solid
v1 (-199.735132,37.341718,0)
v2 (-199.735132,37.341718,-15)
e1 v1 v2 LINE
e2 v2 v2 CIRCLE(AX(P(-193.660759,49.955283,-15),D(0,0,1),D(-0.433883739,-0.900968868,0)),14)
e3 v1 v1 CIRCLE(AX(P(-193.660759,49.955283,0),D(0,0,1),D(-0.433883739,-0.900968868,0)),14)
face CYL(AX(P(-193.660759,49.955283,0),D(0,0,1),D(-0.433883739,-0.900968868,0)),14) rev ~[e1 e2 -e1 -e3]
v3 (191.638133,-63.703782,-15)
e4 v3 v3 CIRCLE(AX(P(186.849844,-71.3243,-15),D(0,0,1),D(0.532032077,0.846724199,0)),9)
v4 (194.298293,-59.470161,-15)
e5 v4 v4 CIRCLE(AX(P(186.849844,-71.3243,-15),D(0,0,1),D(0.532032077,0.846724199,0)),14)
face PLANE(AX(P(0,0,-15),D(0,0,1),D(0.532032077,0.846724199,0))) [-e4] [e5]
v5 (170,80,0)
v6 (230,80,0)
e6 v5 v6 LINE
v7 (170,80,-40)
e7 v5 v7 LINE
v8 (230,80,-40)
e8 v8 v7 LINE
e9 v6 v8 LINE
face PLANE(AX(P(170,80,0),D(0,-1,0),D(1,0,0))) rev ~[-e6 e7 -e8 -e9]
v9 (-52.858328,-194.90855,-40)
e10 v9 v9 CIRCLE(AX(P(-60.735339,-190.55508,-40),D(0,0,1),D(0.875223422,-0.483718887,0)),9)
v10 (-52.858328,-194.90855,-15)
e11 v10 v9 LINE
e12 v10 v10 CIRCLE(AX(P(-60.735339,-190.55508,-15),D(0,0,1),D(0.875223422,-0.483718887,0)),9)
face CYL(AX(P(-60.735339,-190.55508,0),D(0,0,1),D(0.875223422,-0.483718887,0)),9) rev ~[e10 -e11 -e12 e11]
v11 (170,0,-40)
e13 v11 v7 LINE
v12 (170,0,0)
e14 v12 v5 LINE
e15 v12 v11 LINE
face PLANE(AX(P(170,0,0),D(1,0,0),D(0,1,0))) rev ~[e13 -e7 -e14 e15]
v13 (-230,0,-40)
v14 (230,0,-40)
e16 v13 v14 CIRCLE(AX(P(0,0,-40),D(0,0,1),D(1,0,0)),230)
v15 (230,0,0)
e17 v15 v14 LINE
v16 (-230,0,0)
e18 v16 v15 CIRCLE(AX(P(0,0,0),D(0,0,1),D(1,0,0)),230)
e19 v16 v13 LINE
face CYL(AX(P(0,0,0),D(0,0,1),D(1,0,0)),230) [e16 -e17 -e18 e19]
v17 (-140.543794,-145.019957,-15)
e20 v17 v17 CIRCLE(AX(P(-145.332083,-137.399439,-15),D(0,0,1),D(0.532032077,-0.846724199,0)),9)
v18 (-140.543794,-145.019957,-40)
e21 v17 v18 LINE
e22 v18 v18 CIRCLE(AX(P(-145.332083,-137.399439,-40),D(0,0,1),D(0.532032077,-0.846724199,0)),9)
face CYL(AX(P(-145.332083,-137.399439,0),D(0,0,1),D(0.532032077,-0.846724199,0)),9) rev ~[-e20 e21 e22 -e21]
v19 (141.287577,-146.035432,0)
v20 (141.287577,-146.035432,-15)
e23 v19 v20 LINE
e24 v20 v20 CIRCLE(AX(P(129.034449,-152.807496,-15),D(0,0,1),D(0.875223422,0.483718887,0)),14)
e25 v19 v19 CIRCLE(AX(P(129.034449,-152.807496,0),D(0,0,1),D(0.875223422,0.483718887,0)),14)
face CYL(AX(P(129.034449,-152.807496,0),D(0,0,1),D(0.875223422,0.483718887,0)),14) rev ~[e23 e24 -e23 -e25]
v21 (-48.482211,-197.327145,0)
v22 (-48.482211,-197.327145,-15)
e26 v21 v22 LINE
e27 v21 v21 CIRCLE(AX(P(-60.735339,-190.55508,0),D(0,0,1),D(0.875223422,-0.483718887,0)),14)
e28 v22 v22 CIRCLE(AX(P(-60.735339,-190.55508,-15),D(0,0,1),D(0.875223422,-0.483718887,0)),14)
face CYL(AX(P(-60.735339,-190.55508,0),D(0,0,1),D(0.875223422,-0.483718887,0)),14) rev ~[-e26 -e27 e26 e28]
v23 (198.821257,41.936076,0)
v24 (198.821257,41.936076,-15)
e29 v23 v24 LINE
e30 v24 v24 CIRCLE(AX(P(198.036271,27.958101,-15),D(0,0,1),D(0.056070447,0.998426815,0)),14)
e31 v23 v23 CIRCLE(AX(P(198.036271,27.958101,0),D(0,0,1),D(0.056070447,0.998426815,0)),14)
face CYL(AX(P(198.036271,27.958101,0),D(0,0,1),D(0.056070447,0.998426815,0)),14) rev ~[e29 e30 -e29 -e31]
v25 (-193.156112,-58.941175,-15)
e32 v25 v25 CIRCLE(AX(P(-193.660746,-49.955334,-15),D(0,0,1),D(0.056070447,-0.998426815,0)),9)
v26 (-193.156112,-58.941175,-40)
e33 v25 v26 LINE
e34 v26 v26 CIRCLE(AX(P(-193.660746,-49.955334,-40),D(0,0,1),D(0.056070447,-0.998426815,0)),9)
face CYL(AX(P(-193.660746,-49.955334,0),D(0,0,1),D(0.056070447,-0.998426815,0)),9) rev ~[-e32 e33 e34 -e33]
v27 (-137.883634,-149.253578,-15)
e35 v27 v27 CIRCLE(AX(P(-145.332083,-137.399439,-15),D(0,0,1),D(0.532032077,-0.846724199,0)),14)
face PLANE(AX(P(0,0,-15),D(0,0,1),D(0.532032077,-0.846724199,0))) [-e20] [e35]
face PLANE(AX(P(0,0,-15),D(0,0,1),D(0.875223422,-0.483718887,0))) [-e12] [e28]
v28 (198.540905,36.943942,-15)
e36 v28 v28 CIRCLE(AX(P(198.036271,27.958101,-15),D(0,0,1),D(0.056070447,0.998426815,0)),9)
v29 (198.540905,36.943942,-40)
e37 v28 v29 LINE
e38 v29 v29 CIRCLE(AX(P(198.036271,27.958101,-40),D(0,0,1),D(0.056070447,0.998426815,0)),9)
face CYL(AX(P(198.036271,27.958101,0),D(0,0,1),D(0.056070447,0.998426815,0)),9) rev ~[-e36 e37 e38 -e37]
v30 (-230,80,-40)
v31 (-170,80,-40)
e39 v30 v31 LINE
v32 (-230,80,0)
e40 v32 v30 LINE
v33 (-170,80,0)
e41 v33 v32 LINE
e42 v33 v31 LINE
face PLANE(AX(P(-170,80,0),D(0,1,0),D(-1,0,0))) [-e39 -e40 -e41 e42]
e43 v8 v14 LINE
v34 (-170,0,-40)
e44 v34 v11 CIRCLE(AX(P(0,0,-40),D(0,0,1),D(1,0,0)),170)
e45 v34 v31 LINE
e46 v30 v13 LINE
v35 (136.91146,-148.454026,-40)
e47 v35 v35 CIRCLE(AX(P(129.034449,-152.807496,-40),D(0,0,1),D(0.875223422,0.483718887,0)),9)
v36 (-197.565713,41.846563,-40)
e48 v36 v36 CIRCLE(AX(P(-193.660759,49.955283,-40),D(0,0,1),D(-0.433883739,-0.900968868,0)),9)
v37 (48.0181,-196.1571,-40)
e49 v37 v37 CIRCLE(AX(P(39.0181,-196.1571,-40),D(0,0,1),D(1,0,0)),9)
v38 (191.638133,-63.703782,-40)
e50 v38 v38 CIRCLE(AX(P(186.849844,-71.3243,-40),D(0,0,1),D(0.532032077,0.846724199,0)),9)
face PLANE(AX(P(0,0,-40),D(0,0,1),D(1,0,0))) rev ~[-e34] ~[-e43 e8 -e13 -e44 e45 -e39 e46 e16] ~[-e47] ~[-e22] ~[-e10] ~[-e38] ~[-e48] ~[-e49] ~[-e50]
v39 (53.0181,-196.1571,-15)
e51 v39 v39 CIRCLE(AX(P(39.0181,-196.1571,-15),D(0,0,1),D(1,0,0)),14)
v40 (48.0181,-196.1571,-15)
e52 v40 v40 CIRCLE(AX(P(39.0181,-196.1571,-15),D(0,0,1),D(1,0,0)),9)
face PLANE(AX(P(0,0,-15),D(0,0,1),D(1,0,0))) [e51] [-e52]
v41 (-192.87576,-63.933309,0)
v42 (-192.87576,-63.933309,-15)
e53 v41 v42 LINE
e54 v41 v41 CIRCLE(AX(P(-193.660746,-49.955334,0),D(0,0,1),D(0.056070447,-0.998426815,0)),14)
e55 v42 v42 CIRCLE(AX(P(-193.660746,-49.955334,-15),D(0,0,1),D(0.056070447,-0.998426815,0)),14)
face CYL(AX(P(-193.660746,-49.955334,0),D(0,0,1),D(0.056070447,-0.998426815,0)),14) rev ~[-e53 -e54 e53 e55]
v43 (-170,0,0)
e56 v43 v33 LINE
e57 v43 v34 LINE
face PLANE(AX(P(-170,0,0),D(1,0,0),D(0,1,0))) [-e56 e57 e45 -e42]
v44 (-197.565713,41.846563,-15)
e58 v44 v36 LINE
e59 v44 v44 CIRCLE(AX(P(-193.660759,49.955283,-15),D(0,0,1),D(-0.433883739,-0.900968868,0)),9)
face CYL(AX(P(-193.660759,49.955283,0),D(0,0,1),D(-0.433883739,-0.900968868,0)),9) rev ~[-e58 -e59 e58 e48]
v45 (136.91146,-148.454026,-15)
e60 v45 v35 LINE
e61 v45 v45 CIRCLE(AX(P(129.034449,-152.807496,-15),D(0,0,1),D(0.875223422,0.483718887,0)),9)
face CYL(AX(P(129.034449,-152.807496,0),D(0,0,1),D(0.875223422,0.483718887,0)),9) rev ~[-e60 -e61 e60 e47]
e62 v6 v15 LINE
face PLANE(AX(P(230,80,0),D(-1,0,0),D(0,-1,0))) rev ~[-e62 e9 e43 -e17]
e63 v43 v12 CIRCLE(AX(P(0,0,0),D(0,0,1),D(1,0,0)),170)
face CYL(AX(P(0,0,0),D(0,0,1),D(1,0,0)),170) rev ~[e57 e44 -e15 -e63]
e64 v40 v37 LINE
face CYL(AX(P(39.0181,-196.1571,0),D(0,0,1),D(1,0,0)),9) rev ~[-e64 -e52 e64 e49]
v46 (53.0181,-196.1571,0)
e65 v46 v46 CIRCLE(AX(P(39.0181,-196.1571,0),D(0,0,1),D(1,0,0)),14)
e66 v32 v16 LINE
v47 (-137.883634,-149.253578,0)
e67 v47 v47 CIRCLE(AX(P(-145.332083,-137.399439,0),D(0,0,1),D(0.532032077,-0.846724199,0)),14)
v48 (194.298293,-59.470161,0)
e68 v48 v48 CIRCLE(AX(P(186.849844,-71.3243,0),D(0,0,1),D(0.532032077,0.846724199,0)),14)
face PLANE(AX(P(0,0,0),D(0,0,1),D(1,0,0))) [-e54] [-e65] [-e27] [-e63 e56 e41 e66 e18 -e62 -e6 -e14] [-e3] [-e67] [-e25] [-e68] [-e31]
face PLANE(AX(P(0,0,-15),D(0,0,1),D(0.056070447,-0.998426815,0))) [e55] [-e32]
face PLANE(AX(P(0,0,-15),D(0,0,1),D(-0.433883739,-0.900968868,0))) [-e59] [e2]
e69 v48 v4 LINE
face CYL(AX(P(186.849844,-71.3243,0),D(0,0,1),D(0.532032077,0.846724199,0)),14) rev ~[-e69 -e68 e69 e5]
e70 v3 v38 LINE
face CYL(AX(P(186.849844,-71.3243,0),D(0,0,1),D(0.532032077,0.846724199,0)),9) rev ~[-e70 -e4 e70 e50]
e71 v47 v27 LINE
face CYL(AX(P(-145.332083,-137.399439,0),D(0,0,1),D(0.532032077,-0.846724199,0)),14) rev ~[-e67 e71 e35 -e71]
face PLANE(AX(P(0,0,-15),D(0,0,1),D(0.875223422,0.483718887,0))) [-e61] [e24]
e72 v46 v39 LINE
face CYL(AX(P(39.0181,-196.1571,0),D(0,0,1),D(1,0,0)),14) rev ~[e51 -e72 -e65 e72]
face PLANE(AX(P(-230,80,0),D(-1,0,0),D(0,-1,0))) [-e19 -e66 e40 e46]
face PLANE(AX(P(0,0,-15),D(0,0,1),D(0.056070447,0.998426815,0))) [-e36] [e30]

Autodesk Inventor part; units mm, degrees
ref_plane "YZ Plane" through (0, 0, 0) normal (1, 0, 0) x (0, 1, 0)
ref_plane "XZ Plane" through (0, 0, 0) normal (0, 1, 0) x (-1, 0, 0)
ref_plane "XY Plane" through (0, 0, 0) normal (0, 0, 1) x (1, 0, 0)
sketch "Sketch1" plane through (0, 0, 0) normal (0, 0, 1) x (1, 0, 0)
  circle A0 centre (0, 0) radius 200 construction
  line L0 (0, 200) -> (0, 230) construction
  line L1 (0, 200) -> (0, 170) construction
  circle A1 centre (0, 0) radius 170
  circle A2 centre (0, 0) radius 230
  line L2 (-170, 0) -> (-170, 80)
  line L3 (-170, 80) -> (-230, 80)
  line L4 (-230, 80) -> (-230, 0)
  line L5 (170, 0) -> (170, 80)
  line L6 (170, 80) -> (230, 80)
  line L7 (230, 80) -> (230, 0)
  dimension "d13" = 400
  dimension "d26" = 80
  dimension "d36" = 60
extrude "Extrusion1" add sketch "Sketch1" against normal blind 40 contours L5 L6 A2 L3 L2 A1 | L6 L7 A2 | A2 L4 L3 picked at (-188.7937, 40.2131)
sketch "Sketch4" plane through (0, 0, 0) normal (0, 0, 1) x (1, 0, 0)
  circle A0 centre (39.0181, -196.1571) radius 9
  line L0 (0, 0) -> (39.0181, -196.1571) construction
  line L1 (0, 0) -> (0, -276.8337) construction
  dimension "d17" = 18
  dimension "d27" = 200
  dimension "d35" = 11.25
extrude "Extrusion4" cut sketch "Sketch4" against normal through all
sketch "Sketch5" plane through (0, 0, 0) normal (0, 0, 1) x (1, 0, 0)
  circle A0 centre (39.0181, -196.1571) radius 9 projected
  circle A1 centre (39.0181, -196.1571) radius 14
  point P0 (0, 0)
  dimension "d23" = 28
extrude "Extrusion5" cut sketch "Sketch5" against normal blind 15
pattern_circular "Circular Pattern3" count 8 over 202.5 about axis through (0, 0, 0) along (0, 0, -1) of "Extrusion4", "Extrusion5" both ways yes
equation "\"d13\" = Шпил_пласт_НОС_диам_центров"
equation "\"d27\" = 0.5 * Шпил_пласт_НОС_диам_центров"
equation "\"Шпил_пласт_НОС_диам_центров\" = 400"
properties part number "Постель 200"
